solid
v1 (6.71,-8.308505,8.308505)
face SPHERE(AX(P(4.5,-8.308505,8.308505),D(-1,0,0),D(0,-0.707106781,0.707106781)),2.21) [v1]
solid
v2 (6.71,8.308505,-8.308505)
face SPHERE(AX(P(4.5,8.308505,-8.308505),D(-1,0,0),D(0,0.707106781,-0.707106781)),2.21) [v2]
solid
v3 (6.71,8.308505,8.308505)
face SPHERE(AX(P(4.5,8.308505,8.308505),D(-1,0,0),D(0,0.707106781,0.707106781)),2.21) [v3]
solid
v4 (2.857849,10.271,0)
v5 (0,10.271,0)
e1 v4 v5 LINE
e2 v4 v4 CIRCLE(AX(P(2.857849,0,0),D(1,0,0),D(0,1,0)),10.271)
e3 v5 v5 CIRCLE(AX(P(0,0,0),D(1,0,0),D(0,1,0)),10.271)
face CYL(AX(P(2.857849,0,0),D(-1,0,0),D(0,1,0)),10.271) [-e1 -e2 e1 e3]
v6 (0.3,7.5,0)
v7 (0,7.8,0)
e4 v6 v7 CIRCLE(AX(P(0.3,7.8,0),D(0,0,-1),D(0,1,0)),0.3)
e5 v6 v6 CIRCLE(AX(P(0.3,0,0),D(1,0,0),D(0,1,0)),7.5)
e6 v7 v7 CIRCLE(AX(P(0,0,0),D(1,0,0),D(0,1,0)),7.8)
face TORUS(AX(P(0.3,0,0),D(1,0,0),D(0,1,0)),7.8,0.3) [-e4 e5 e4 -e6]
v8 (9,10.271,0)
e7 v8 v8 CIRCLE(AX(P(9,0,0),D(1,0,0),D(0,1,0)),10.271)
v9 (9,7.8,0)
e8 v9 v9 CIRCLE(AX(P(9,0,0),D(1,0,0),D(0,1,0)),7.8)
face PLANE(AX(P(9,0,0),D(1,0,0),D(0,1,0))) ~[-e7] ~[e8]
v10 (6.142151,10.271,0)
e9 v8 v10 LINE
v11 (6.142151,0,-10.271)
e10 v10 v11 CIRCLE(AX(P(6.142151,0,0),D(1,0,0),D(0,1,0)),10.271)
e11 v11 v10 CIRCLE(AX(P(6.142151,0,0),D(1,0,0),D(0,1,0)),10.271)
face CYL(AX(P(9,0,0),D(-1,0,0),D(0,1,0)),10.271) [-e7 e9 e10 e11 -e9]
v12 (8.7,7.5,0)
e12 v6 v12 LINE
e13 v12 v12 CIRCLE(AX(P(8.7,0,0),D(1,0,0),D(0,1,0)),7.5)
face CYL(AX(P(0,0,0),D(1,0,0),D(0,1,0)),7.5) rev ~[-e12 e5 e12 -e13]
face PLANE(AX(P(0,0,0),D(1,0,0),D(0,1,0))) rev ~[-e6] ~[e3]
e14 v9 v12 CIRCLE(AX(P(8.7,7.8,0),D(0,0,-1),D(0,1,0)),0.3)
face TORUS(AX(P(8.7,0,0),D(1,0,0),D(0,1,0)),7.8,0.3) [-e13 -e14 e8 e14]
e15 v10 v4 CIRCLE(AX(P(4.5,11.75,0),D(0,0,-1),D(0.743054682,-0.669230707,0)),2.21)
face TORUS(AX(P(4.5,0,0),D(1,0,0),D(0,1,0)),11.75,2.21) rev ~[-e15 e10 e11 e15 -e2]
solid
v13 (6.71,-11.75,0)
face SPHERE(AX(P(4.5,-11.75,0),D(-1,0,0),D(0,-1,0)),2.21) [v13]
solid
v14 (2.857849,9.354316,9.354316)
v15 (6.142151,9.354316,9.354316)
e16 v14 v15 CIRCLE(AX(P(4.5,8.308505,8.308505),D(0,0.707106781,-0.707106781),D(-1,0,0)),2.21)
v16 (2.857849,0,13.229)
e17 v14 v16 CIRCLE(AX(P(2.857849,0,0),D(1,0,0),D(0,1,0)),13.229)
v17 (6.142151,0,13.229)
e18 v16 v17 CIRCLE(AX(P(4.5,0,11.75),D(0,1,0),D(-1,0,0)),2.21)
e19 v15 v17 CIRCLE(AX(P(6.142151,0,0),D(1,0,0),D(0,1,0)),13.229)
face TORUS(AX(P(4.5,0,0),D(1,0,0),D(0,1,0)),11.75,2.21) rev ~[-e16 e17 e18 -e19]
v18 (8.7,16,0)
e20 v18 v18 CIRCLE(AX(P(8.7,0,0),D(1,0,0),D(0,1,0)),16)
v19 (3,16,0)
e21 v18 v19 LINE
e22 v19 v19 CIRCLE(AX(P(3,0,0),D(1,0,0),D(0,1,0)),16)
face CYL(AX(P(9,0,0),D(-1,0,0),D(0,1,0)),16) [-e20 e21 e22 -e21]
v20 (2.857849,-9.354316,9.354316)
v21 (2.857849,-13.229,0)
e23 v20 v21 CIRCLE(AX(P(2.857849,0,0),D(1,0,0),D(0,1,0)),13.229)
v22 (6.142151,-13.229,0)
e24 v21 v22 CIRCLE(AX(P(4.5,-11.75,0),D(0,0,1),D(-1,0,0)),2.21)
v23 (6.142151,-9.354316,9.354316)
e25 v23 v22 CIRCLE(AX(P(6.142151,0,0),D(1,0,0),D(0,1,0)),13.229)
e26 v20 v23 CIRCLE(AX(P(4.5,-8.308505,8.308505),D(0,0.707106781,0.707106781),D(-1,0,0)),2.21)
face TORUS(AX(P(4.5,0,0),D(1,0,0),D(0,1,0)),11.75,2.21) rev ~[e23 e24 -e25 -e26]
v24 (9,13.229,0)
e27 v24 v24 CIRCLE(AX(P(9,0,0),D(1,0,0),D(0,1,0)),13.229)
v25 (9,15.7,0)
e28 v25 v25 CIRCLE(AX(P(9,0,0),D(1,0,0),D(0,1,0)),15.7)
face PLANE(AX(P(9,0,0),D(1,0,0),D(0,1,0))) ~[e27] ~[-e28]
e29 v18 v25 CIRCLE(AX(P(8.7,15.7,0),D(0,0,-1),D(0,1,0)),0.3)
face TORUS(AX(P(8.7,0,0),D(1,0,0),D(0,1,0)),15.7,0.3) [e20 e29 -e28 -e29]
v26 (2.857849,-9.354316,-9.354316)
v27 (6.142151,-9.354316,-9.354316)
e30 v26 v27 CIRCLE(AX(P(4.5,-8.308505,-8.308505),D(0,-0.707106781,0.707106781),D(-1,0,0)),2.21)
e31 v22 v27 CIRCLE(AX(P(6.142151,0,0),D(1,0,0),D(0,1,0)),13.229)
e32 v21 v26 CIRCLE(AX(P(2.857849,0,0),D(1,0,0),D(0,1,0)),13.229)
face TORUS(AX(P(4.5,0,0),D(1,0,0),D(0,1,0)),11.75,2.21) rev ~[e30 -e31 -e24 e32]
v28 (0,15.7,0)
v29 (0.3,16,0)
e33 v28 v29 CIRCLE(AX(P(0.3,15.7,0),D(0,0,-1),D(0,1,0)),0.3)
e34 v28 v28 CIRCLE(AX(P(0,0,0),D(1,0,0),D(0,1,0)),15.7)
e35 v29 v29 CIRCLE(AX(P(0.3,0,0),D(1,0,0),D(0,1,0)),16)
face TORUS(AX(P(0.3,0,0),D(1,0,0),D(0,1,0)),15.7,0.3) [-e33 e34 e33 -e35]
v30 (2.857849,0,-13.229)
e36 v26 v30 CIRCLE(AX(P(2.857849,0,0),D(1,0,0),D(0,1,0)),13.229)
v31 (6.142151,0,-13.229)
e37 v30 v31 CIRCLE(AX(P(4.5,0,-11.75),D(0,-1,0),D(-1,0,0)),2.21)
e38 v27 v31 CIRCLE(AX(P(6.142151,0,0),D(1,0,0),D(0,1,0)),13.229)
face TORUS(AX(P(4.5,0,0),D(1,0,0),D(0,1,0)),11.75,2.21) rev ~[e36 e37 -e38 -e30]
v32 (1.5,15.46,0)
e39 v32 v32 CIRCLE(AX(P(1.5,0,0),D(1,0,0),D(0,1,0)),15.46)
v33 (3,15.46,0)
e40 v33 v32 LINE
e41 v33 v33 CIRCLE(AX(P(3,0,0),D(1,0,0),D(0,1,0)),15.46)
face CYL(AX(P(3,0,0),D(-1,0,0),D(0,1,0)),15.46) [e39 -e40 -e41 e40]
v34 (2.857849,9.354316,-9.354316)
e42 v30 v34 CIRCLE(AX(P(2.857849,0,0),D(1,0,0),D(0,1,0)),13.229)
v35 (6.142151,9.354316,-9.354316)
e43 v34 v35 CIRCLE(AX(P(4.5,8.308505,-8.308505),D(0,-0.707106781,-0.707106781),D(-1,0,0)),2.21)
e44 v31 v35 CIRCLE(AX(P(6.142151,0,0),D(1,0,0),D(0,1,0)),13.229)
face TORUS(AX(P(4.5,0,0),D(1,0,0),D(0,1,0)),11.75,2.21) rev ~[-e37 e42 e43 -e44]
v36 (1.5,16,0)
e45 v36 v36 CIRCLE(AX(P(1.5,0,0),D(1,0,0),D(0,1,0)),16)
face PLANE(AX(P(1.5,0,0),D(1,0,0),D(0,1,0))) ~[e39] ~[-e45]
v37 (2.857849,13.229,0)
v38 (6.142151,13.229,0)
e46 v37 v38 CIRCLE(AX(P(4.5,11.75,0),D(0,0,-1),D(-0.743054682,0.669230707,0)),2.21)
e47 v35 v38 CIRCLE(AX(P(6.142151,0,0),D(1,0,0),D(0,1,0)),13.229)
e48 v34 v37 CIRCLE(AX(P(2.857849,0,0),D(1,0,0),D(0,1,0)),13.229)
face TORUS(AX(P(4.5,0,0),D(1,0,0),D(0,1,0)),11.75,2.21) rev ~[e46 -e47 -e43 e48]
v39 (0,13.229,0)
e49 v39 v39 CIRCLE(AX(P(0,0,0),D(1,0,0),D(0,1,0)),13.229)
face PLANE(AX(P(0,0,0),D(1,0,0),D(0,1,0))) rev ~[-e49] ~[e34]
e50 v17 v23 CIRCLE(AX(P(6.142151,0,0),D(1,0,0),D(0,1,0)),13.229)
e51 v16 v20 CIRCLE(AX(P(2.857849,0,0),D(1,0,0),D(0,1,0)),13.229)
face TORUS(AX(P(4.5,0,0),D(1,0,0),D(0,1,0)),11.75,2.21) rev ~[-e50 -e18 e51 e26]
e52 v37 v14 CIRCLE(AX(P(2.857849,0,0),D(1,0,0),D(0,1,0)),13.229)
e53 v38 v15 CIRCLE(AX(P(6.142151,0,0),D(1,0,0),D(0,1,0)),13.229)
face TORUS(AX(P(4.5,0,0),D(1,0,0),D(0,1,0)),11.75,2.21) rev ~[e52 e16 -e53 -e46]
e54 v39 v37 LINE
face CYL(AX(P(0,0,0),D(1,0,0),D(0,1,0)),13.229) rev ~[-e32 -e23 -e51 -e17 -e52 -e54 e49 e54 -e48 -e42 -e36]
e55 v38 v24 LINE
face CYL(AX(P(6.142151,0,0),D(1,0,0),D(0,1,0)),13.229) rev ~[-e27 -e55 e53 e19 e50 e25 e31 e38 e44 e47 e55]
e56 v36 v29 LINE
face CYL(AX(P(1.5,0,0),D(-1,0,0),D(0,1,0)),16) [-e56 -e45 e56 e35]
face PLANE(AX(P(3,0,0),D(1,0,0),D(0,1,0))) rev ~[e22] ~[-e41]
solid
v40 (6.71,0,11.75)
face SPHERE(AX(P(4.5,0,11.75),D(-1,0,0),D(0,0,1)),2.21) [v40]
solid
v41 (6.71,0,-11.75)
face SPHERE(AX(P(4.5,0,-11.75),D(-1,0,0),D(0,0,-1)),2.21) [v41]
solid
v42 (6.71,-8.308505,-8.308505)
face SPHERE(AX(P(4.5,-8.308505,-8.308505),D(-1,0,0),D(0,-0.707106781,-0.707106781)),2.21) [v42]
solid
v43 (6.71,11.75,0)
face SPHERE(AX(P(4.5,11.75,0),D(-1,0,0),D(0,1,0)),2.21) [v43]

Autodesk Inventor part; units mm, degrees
ref_plane "YZ Plane" through (0, 0, 0) normal (1, 0, 0) x (0, 1, 0)
ref_plane "XZ Plane" through (0, 0, 0) normal (0, 1, 0) x (-1, 0, 0)
ref_plane "XY Plane" through (0, 0, 0) normal (0, 0, 1) x (1, 0, 0)
sketch "草图" plane through (0, 0, 0) normal (0, 0, 1) x (1, 0, 0)
  circle A0 centre (4.5, 11.75) radius 2.21
  line L0 (4.5, 11.75) -> (6.71, 11.75)
  line L1 (4.5, 11.75) -> (2.29, 11.75)
  line L2 (4.5, 9.54) -> (4.5, 13.96)
  line L3 (2.857849, 10.271) -> (0, 10.271)
  line L4 (0, 10.271) -> (0, 10.271)
  line L5 (0, 10.271) -> (0, 10.271)
  line L6 (0, 7.5) -> (9, 7.5)
  line L7 (2.857849, 13.229) -> (0, 13.229)
  line L8 (0, 13.229) -> (0, 13.229)
  line L9 (0, 13.229) -> (0, 13.229)
  line L10 (0, 16) -> (1.5, 16)
  line L11 (1.5, 16) -> (1.5, 15.46)
  line L12 (1.5, 15.46) -> (3, 15.46)
  line L13 (3, 15.46) -> (3, 16)
  line L14 (3, 16) -> (9, 16)
  line L15 (6.142151, 10.271) -> (9, 10.271)
  line L16 (9, 10.271) -> (9, 10.271)
  line L17 (9, 10.271) -> (9, 10.271)
  line L18 (9, 10.271) -> (9, 7.5)
  line L19 (6.142151, 13.229) -> (9, 13.229)
  line L20 (9, 13.229) -> (9, 13.229)
  line L21 (9, 13.229) -> (9, 13.229)
  line L22 (9, 13.229) -> (9, 16)
  line L23 (-3, 0) -> (18, 0)
  line L24 (0, -1.2) -> (0, 10.7)
  line L25 (0, 13.229) -> (0, 13.229)
  line L26 (0, 13.229) -> (0, 13.229)
  line L27 (0, 10.271) -> (0, 10.271)
  line L28 (0, 10.271) -> (0, 10.271)
  line L29 (9, 13.229) -> (9, 13.229)
  line L30 (9, 13.229) -> (9, 13.229)
  line L31 (9, 10.271) -> (9, 10.271)
  line L32 (9, 10.271) -> (9, 10.271)
  dimension "d0" = 4.42
  dimension "d7" = 15
  dimension "d8" = 32
  dimension "d9" = 23.5
  dimension "d10" = 30.92
  dimension "d11" = 20.542
  dimension "d12" = 20.542
  dimension "d13" = 20.542
  dimension "d14" = 0
  dimension "d15" = 9
  dimension "d16" = 9
  dimension "d19" = 1.5
  dimension "d20" = 3
  dimension "d22" = 4.5
sketch "草图 outline for 轴承体" plane through (0, 0, 0) normal (0, 0, 1) x (1, 0, 0)
  arc A0 (2.857849, 13.229) -> (6.142151, 13.229) centre (4.5, 11.75) cw
  line L0 (6.142151, 13.229) -> (9, 13.229)
  line L1 (9, 13.229) -> (9, 16)
  line L2 (9, 16) -> (3, 16)
  line L3 (3, 16) -> (3, 15.46)
  line L4 (3, 15.46) -> (1.5, 15.46)
  line L5 (1.5, 15.46) -> (1.5, 16)
  line L6 (1.5, 16) -> (0, 16)
  line L7 (0, 16) -> (0, 13.229)
  line L8 (0, 13.229) -> (2.857849, 13.229)
  arc A1 (6.142151, 10.271) -> (2.857849, 10.271) centre (4.5, 11.75) cw
  line L9 (2.857849, 10.271) -> (0, 10.271)
  line L10 (0, 10.271) -> (0, 7.5)
  line L11 (0, 7.5) -> (9, 7.5)
  line L12 (9, 7.5) -> (9, 10.271)
  line L13 (9, 10.271) -> (6.142151, 10.271)
revolve "轴承体" add sketch "草图 outline for 轴承体" angle 360 about axis through (-10, 0, 0) along (1, 0, 0)
fillet "圆角1" radius 0.3 4 edges at (0, -16, 0) (9, -16, 0) (0, -7.5, 0) (9, -7.5, 0)
revolve "球" add sketch "草图" angle 360 about axis through (4.5, 11.75, 0) along (-1, 0, 0) picked at (5.697791, 12.588902) picked at (3.302209, 12.588902) contours L0 L2 A0 | L1 A0 L2
pattern_circular "IDS_ARRAYBALL[SIMPL:T]" count 8 over 360 about axis through (-10, 0, 0) along (1, 0, 0) of "球"
equation "\"d0\" = -0.26 * WD + 0.26 * BD"
equation "\"d7\" = WD"
equation "\"d8\" = BD"
equation "\"d9\" = 0.5 * WD + 0.5 * BD"
equation "\"d10\" = BD - 2 * RT"
equation "\"d11\" = ND2"
equation "\"d12\" = ND"
equation "\"d13\" = 0.326 * BD + 0.674 * WD"
equation "\"d15\" = KB - NBR"
equation "\"d16\" = KB"
equation "\"d19\" = NBR3"
equation "\"d20\" = 2 * NBR3"
equation "\"d22\" = 0.5 * KB"
equation "\"d1\" = KRS"
equation "\"WD\" = 15"
equation "\"BD\" = 32"
equation "\"KB\" = 9"
equation "\"KRS\" = 0.3"
equation "\"ND\" = 0.674 * WD + 0.326 * BD"
equation "\"ND2\" = 0.674 * WD + 0.326 * BD"
equation "\"NBR2\" = 0"
equation "\"RT\" = 1.8 * KRS"
equation "\"NBR\" = 0"
equation "\"NBR3\" = 0.166667 * KB"
equation "\"WR\" = 0.5 * WD"
equation "\"KR1S\" = 0.3"
equation "\"BR\" = 0.5 * BD"
properties part number "滚动轴承 6002 N GB/T 276-94" material "钢，软"
